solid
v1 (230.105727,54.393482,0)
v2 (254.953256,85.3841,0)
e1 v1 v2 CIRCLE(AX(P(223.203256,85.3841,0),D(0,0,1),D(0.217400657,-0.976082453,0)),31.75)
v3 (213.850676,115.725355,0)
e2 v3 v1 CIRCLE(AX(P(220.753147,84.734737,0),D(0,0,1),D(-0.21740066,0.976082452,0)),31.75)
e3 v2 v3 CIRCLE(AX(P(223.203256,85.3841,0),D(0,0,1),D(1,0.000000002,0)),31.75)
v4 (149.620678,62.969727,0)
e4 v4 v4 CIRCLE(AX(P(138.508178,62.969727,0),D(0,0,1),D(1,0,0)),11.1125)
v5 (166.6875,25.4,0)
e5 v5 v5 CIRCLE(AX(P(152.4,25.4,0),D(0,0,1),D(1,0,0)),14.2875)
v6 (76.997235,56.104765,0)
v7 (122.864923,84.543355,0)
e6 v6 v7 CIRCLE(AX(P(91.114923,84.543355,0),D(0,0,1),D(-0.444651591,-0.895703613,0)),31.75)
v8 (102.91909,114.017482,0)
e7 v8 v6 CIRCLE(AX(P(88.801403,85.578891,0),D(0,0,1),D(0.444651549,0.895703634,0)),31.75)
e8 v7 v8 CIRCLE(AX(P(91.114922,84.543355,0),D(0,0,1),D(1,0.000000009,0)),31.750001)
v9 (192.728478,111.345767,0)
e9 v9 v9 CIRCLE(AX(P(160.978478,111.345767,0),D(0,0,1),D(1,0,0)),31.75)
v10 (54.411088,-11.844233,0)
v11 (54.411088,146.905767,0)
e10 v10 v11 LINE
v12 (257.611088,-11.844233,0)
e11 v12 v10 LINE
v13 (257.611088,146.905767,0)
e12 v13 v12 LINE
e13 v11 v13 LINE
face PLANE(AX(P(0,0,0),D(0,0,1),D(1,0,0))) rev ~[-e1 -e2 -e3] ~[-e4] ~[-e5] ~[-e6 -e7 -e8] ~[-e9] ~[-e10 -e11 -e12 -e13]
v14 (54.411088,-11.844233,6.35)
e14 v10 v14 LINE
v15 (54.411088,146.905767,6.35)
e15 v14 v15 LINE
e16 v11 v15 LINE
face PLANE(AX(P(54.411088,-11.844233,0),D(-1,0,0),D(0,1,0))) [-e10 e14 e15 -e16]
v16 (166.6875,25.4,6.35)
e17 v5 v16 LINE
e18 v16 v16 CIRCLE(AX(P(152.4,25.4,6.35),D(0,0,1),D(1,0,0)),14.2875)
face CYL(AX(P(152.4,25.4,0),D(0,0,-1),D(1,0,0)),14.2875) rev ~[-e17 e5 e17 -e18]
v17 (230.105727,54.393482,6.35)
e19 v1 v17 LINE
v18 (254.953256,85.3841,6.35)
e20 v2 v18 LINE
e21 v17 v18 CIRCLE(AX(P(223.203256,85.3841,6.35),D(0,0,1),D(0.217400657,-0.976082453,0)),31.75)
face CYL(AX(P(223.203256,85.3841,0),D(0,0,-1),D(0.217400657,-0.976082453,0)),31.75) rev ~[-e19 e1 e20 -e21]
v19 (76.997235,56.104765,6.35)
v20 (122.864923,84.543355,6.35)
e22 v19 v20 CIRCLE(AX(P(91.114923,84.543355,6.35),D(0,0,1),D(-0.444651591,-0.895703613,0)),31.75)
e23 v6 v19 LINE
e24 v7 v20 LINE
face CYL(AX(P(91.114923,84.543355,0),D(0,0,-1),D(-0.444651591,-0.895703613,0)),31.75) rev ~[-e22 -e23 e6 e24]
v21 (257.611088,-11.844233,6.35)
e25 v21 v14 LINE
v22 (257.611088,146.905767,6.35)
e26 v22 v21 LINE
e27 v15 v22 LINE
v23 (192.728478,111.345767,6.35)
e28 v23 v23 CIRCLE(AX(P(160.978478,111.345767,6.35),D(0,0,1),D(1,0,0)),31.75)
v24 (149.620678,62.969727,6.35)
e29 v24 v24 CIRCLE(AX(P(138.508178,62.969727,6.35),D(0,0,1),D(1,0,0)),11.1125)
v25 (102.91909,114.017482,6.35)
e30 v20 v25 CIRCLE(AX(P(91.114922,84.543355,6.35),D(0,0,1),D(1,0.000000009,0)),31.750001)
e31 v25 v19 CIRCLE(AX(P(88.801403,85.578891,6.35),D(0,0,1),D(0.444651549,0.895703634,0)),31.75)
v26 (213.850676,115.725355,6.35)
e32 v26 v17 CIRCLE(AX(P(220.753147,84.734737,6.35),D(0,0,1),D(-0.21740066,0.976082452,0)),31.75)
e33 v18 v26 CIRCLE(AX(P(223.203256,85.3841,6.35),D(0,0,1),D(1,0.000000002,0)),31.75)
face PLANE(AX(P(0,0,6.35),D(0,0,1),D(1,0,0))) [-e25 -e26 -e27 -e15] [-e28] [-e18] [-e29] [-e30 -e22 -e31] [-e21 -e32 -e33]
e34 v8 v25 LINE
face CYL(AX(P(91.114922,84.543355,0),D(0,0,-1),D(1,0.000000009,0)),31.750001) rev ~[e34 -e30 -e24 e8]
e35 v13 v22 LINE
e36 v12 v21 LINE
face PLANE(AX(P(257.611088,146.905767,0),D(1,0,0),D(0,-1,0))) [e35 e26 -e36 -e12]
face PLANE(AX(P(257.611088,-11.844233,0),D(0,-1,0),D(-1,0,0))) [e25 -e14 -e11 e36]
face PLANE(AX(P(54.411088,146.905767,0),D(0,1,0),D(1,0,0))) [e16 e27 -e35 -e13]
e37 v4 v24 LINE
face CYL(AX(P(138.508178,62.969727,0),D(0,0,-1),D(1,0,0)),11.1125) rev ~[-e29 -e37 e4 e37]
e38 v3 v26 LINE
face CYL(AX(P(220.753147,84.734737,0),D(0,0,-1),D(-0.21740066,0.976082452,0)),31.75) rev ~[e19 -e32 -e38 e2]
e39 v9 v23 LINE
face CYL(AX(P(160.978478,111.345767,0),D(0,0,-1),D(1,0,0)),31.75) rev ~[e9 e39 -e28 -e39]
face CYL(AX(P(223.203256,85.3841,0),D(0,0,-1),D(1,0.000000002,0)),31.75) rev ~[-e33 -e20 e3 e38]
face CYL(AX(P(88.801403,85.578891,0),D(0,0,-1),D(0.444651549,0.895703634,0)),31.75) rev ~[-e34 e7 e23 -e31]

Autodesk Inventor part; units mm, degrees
ref_plane "YZ Plane" through (0, 0, 0) normal (1, 0, 0) x (0, 1, 0)
ref_plane "XZ Plane" through (0, 0, 0) normal (0, 1, 0) x (-1, 0, 0)
ref_plane "XY Plane" through (0, 0, 0) normal (0, 0, 1) x (1, 0, 0)
sketch "Sketch1" plane through (0, 0, 0) normal (0, 0, 1) x (1, 0, 0)
  line L0 (0, 0) -> (304.8, 0) construction
  line L1 (304.8, 0) -> (304.8, 50.8) construction
  line L2 (304.8, 50.8) -> (0, 50.8) construction
  line L3 (0, 50.8) -> (0, 0) construction
  circle A0 centre (152.4, 25.4) radius 14.2875
  circle A1 centre (152.4, 25.4) radius 30.48 construction
  circle A2 centre (152.4, 25.4) radius 22.225 construction
  line L4 (152.4, 25.4) -> (138.508178, 62.969727) construction
  circle A3 centre (138.508178, 62.969727) radius 9.525 construction
  circle A4 centre (138.508178, 62.969727) radius 17.78 construction
  circle A5 centre (89.971088, 85.09) radius 31.75 construction
  circle A6 centre (160.978478, 111.345767) radius 31.75
  circle A7 centre (221.970096, 85.09) radius 31.75 construction
  line L5 (0, 50.8) -> (0, 53.34) construction
  line L6 (0, 53.34) -> (304.8, 53.34) construction
  line L7 (304.8, 53.34) -> (304.8, 50.8) construction
  circle A8 centre (138.508178, 62.969727) radius 21.59 construction
  circle A9 centre (152.4, 25.4) radius 46.99 construction
  circle A10 centre (152.4, 25.4) radius 50.8 construction
  arc A11 (84.94082, 79.326416) -> (90.918413, 92.681118) centre (89.971088, 85.09) ccw construction
  circle A12 centre (160.978478, 111.345767) radius 7.65 construction
  arc A13 (221.694578, 92.735037) -> (225.517168, 78.312037) centre (221.970096, 85.09) ccw construction
  circle A14 centre (160.978478, 111.345767) radius 9.1 construction
  circle A15 centre (138.508178, 62.969727) radius 22.9 construction
  line L8 (84.94082, 79.326416) -> (123.450252, 45.716644) construction
  line L9 (168.548316, 110.241211) -> (161.168218, 59.663279) construction
  line L10 (90.918413, 92.681118) -> (89.971088, 85.09) construction
  line L11 (89.971088, 85.09) -> (84.94082, 79.326416) construction
  circle A16 centre (126.19198, 96.27826) radius 3.175 construction
  circle A17 centre (126.19198, 96.27826) radius 7.9375 construction
  line L12 (90.918413, 92.681118) -> (125.209053, 88.401855) construction
  line L13 (132.062639, 90.936044) -> (155.320457, 116.494485) construction
  line L14 (155.320457, 116.494485) -> (160.978478, 111.345767) construction
  line L15 (168.548316, 110.241211) -> (160.978478, 111.345767) construction
  line L16 (138.508178, 62.969727) -> (126.19198, 96.27826) construction
  line L17 (89.971088, 85.09) -> (160.978478, 111.345767) construction
  line L18 (152.4, 25.4) -> (89.971088, 85.09) construction
  line L19 (152.4, 25.4) -> (160.978478, 111.345767) construction
  circle A18 centre (126.19198, 96.27826) radius 9.2075 construction
  circle A19 centre (126.19198, 96.27826) radius 6.1595 construction
  arc A20 (90.918413, 92.681118) -> (84.94082, 79.326416) centre (89.971088, 85.09) ccw construction
  circle A21 centre (160.978478, 111.345767) radius 25.4 construction
  circle A22 centre (221.970096, 85.09) radius 25.4 construction
  line L20 (102.942353, 114.069454) -> (76.999823, 56.110546) construction
  circle A23 centre (89.971088, 85.09) radius 25.4 construction
  line L21 (213.836088, 115.780396) -> (230.104105, 54.399604) construction
  line L22 (54.411088, 146.905767) -> (257.611088, 146.905767)
  line L23 (257.611088, 146.905767) -> (257.611088, -11.844233)
  line L24 (257.611088, -11.844233) -> (54.411088, -11.844233)
  line L25 (54.411088, -11.844233) -> (54.411088, 146.905767)
  circle A24 centre (138.508178, 62.969727) radius 11.1125
  arc A25 (225.312875, 75.445533) -> (221.093638, 95.322667) centre (223.203256, 85.3841) ccw construction
  line L26 (220.753147, 84.734737) -> (228.477303, 60.537683) construction
  line L27 (223.203256, 85.3841) -> (228.477303, 60.537683) construction
  line L28 (220.753147, 84.734737) -> (213.028991, 108.931791) construction
  line L29 (223.203256, 85.3841) -> (217.92921, 110.230517) construction
  arc A26 (212.304851, 111.200264) -> (213.75313, 106.663317) centre (213.028991, 108.931791) ccw construction
  arc A27 (218.423652, 107.901165) -> (217.434768, 112.559869) centre (217.92921, 110.230517) ccw construction
  arc A28 (218.423652, 107.901165) -> (213.75313, 106.663317) centre (228.477303, 60.537683) ccw construction
  arc A29 (217.434768, 112.559869) -> (212.304851, 111.200264) centre (228.477303, 60.537683) ccw construction
  line L30 (213.028991, 108.931791) -> (212.304851, 111.200264) construction
  line L31 (217.92921, 110.230517) -> (217.434768, 112.559869) construction
  arc A30 (221.093638, 95.322667) -> (217.663484, 94.413558) centre (228.477303, 60.537683) ccw construction
  arc A31 (225.312875, 75.445533) -> (223.842809, 75.055915) centre (228.477303, 60.537683) ccw construction
  line L32 (102.635769, 107.180274) -> (91.114923, 84.543355) construction
  line L33 (79.594076, 61.906436) -> (88.801403, 85.578892) construction
  arc A32 (98.871917, 111.470639) -> (97.145543, 107.032054) centre (98.00873, 109.251347) ccw construction
  arc A33 (101.55569, 105.058063) -> (103.715849, 109.302485) centre (102.635769, 107.180274) ccw construction
  arc A34 (101.55569, 105.058063) -> (97.145543, 107.032054) centre (79.594076, 61.906436) ccw construction
  line L34 (98.00873, 109.251347) -> (98.871917, 111.470639) construction
  line L35 (102.635769, 107.180274) -> (103.715849, 109.302485) construction
  arc A35 (103.715849, 109.302485) -> (98.871917, 111.470639) centre (79.594076, 61.906436) ccw construction
  arc A36 (217.663484, 94.413558) -> (223.842809, 75.055915) centre (220.753147, 84.734737) ccw construction
  arc A37 (86.506584, 75.488588) -> (95.723261, 93.598123) centre (91.114923, 84.543355) ccw construction
  line L36 (88.801403, 85.578892) -> (98.00873, 109.251347) construction
  line L37 (91.114923, 84.543355) -> (79.594076, 61.906436) construction
  arc A38 (86.506584, 75.488588) -> (85.118472, 76.10991) centre (79.594076, 61.906436) ccw construction
  arc A39 (95.723261, 93.598123) -> (92.484334, 95.047874) centre (79.594076, 61.906436) ccw construction
  arc A40 (92.484334, 95.047874) -> (85.118472, 76.10991) centre (88.801403, 85.578892) ccw construction
  line L38 (160.978478, 111.345767) -> (138.015112, 122.201357) construction
  line L39 (160.978478, 111.345767) -> (183.941843, 100.490177) construction
  circle A41 centre (138.508178, 62.969727) radius 26.75 construction
  line L40 (221.694578, 92.735037) -> (137.544764, 89.702373) construction
  line L41 (225.517168, 78.312037) -> (150.911337, 39.269007) construction
  line L42 (221.970096, 85.09) -> (221.694578, 92.735037) construction
  line L43 (221.970096, 85.09) -> (225.517168, 78.312037) construction
  line L44 (138.508178, 62.969727) -> (137.544764, 89.702373) construction
  line L45 (138.508178, 62.969727) -> (150.911337, 39.269007) construction
  arc A42 (225.517168, 78.312037) -> (221.694578, 92.735037) centre (221.970096, 85.09) ccw construction
  arc A43 (225.517168, 78.312037) -> (224.776319, 77.973286) centre (221.970096, 85.09) ccw construction
  line L46 (138.508178, 62.969727) -> (221.970096, 85.09) construction
  circle A44 centre (88.801403, 85.578892) radius 31.75
  circle A45 centre (91.114923, 84.543355) radius 31.75
  line L47 (98.871917, 111.470639) -> (100.310562, 115.16946) construction
  line L48 (103.715849, 109.302485) -> (105.515981, 112.839504) construction
  arc A46 (105.515981, 112.839504) -> (100.310562, 115.16946) centre (79.594076, 61.906436) ccw
  circle A47 centre (220.753147, 84.734737) radius 31.75
  circle A48 centre (223.203256, 85.3841) radius 31.75
  line L49 (212.304851, 111.200264) -> (211.097951, 114.981054) construction
  line L50 (217.434768, 112.559869) -> (216.610698, 116.442121) construction
  arc A49 (216.610698, 116.442121) -> (211.097951, 114.981054) centre (228.477303, 60.537683) ccw
  point P0 (215.46289, 109.642317)
  point P1 (100.3481, 108.273564)
  dimension "d114" = 63.5
  dimension "d115" = 63.5
  dimension "d122" = 63.5
  dimension "d123" = 63.5
  dimension "d1" = 50.8
  dimension "d2" = 28.575
  dimension "d3" = 25.4
  dimension "d4" = 152.4
  dimension "d7" = 60.96
  dimension "d8" = 44.45
  dimension "d9" = 19.05
  dimension "d10" = 35.56
  dimension "d11" = 40.0558
  dimension "d12" = 63.5
  dimension "d13" = 63.5
  dimension "d14" = 63.5
  dimension "d15" = 2.54
  dimension "d16" = 304.8
  dimension "d17" = 43.18
  dimension "d18" = 93.98
  dimension "d19" = 101.6
  dimension "d21" = 15.3
  dimension "d22" = 15.3
  dimension "d24" = 18.2
  dimension "d29" = 45.8
  dimension "d30" = 146
  dimension "d31" = 6.35
  dimension "d32" = 15.875
  dimension "d33" = 146
  dimension "d35" = 18.415
  dimension "d37" = 12.319
  dimension "d40" = 50.8
  dimension "d41" = 50.8
  dimension "d42" = 17
  dimension "d43" = 17
  dimension "d44" = 50.8
  dimension "d53" = 203.2
  dimension "d54" = 158.75
  dimension "d55" = 35.56
  dimension "d56" = 35.56
  dimension "d57" = 22.225
  dimension "d67" = 25.4
  dimension "d68" = 25.4
  dimension "d69" = 2.86
  dimension "d70" = 25.4
  dimension "d71" = 25.4
  dimension "d72" = 4.7625
  dimension "d75" = 2.86
  dimension "d80" = 4.7625
  dimension "d82" = 4.7625
  dimension "d83" = 50.8
  dimension "d84" = 50.8
  dimension "d85" = 10.16
  dimension "d97" = 48.41875
  dimension "d99" = 20.32
  dimension "d101" = 25.4
  dimension "d102" = 25.4
  dimension "d103" = 10.16
  dimension "d105" = 17
  dimension "d106" = 17
  dimension "d107" = 53.5
  dimension "d108" = 154.44
  dimension "d109" = 7.65
  dimension "d111" = 86.34349
  dimension "d112" = 12.7801
  dimension "d113" = 12.7801
  dimension "d116" = 57.15
sketch "Sketch1 outline for Extrusion3" plane through (0, 0, 0) normal (0, 0, 1) x (1, 0, 0)
  line L0 (54.411088, 146.905767) -> (257.611088, 146.905767)
  line L1 (54.411088, -11.844233) -> (54.411088, 146.905767)
  line L2 (257.611088, 146.905767) -> (257.611088, -11.844233)
  line L3 (257.611088, -11.844233) -> (54.411088, -11.844233)
  circle A0 centre (152.4, 25.4) radius 14.2875
  circle A1 centre (138.508178, 62.969727) radius 11.1125
  arc A2 (122.864923, 84.543355) -> (102.91909, 114.017482) centre (91.114923, 84.543355) ccw
  arc A3 (102.91909, 114.017482) -> (76.997235, 56.104765) centre (88.801403, 85.578892) ccw
  arc A4 (76.997235, 56.104765) -> (122.864923, 84.543355) centre (91.114923, 84.543355) ccw
  arc A5 (254.953256, 85.3841) -> (213.850676, 115.725355) centre (223.203256, 85.3841) ccw
  arc A6 (213.850676, 115.725355) -> (230.105727, 54.393482) centre (220.753147, 84.734737) ccw
  arc A7 (230.105727, 54.393482) -> (254.953256, 85.3841) centre (223.203256, 85.3841) ccw
  circle A8 centre (160.978478, 111.345767) radius 31.75
extrude "Extrusion3" add sketch "Sketch1 outline for Extrusion3" along normal blind 6.35
equation "\"d2\" = BearingLargeOD"
equation "\"d7\" = Gear48tPD"
equation "\"d8\" = Gear35tPD"
equation "\"d9\" = Gear15tPD"
equation "\"d10\" = Gear28tPD"
equation "\"d11\" = 0.5 * Gear48tPD + 0.5 * Gear15tPD + MeshingClearance"
equation "\"d12\" = CimOD"
equation "\"d13\" = CimOD"
equation "\"d14\" = CimOD"
equation "\"d17\" = Gear28tPD + ClearanceDiameter"
equation "\"d18\" = WheelOD"
equation "\"d19\" = WheelClearance"
equation "\"Pulley48tPD\" = 45.8"
equation "\"Pulley19tPD\" = 18.2"
equation "\"Pulley16tPD\" = 15.3"
equation "\"Gear15tPD\" = 19.05"
equation "\"Gear35tPD\" = 44.45"
equation "\"Gear48tPD\" = 60.96"
equation "\"Gear28tPD\" = 35.56"
equation "\"BearingLargeOD\" = 28.575"
equation "\"BearingSmallOD\" = 22.225"
equation "\"MeshingClearance\" = 0.0508"
equation "\"CimOD\" = 63.5"
equation "\"WheelOD\" = 93.98"
equation "\"ClearanceDiameter\" = 7.62"
equation "\"WheelClearance\" = 101.6"
equation "\"TensioningBearingID\" = 6.35"
equation "\"TensioningBearingOD\" = 15.875"
equation "\"SpingClipClearance\" = 8.89"
equation "\"Pi\" = 79.79645"
equation "\"Pulley56tPD\" = 53.5"
equation "\"BearingXLargeOD\" = 34.925"
properties part number "OutlineSketch1"
